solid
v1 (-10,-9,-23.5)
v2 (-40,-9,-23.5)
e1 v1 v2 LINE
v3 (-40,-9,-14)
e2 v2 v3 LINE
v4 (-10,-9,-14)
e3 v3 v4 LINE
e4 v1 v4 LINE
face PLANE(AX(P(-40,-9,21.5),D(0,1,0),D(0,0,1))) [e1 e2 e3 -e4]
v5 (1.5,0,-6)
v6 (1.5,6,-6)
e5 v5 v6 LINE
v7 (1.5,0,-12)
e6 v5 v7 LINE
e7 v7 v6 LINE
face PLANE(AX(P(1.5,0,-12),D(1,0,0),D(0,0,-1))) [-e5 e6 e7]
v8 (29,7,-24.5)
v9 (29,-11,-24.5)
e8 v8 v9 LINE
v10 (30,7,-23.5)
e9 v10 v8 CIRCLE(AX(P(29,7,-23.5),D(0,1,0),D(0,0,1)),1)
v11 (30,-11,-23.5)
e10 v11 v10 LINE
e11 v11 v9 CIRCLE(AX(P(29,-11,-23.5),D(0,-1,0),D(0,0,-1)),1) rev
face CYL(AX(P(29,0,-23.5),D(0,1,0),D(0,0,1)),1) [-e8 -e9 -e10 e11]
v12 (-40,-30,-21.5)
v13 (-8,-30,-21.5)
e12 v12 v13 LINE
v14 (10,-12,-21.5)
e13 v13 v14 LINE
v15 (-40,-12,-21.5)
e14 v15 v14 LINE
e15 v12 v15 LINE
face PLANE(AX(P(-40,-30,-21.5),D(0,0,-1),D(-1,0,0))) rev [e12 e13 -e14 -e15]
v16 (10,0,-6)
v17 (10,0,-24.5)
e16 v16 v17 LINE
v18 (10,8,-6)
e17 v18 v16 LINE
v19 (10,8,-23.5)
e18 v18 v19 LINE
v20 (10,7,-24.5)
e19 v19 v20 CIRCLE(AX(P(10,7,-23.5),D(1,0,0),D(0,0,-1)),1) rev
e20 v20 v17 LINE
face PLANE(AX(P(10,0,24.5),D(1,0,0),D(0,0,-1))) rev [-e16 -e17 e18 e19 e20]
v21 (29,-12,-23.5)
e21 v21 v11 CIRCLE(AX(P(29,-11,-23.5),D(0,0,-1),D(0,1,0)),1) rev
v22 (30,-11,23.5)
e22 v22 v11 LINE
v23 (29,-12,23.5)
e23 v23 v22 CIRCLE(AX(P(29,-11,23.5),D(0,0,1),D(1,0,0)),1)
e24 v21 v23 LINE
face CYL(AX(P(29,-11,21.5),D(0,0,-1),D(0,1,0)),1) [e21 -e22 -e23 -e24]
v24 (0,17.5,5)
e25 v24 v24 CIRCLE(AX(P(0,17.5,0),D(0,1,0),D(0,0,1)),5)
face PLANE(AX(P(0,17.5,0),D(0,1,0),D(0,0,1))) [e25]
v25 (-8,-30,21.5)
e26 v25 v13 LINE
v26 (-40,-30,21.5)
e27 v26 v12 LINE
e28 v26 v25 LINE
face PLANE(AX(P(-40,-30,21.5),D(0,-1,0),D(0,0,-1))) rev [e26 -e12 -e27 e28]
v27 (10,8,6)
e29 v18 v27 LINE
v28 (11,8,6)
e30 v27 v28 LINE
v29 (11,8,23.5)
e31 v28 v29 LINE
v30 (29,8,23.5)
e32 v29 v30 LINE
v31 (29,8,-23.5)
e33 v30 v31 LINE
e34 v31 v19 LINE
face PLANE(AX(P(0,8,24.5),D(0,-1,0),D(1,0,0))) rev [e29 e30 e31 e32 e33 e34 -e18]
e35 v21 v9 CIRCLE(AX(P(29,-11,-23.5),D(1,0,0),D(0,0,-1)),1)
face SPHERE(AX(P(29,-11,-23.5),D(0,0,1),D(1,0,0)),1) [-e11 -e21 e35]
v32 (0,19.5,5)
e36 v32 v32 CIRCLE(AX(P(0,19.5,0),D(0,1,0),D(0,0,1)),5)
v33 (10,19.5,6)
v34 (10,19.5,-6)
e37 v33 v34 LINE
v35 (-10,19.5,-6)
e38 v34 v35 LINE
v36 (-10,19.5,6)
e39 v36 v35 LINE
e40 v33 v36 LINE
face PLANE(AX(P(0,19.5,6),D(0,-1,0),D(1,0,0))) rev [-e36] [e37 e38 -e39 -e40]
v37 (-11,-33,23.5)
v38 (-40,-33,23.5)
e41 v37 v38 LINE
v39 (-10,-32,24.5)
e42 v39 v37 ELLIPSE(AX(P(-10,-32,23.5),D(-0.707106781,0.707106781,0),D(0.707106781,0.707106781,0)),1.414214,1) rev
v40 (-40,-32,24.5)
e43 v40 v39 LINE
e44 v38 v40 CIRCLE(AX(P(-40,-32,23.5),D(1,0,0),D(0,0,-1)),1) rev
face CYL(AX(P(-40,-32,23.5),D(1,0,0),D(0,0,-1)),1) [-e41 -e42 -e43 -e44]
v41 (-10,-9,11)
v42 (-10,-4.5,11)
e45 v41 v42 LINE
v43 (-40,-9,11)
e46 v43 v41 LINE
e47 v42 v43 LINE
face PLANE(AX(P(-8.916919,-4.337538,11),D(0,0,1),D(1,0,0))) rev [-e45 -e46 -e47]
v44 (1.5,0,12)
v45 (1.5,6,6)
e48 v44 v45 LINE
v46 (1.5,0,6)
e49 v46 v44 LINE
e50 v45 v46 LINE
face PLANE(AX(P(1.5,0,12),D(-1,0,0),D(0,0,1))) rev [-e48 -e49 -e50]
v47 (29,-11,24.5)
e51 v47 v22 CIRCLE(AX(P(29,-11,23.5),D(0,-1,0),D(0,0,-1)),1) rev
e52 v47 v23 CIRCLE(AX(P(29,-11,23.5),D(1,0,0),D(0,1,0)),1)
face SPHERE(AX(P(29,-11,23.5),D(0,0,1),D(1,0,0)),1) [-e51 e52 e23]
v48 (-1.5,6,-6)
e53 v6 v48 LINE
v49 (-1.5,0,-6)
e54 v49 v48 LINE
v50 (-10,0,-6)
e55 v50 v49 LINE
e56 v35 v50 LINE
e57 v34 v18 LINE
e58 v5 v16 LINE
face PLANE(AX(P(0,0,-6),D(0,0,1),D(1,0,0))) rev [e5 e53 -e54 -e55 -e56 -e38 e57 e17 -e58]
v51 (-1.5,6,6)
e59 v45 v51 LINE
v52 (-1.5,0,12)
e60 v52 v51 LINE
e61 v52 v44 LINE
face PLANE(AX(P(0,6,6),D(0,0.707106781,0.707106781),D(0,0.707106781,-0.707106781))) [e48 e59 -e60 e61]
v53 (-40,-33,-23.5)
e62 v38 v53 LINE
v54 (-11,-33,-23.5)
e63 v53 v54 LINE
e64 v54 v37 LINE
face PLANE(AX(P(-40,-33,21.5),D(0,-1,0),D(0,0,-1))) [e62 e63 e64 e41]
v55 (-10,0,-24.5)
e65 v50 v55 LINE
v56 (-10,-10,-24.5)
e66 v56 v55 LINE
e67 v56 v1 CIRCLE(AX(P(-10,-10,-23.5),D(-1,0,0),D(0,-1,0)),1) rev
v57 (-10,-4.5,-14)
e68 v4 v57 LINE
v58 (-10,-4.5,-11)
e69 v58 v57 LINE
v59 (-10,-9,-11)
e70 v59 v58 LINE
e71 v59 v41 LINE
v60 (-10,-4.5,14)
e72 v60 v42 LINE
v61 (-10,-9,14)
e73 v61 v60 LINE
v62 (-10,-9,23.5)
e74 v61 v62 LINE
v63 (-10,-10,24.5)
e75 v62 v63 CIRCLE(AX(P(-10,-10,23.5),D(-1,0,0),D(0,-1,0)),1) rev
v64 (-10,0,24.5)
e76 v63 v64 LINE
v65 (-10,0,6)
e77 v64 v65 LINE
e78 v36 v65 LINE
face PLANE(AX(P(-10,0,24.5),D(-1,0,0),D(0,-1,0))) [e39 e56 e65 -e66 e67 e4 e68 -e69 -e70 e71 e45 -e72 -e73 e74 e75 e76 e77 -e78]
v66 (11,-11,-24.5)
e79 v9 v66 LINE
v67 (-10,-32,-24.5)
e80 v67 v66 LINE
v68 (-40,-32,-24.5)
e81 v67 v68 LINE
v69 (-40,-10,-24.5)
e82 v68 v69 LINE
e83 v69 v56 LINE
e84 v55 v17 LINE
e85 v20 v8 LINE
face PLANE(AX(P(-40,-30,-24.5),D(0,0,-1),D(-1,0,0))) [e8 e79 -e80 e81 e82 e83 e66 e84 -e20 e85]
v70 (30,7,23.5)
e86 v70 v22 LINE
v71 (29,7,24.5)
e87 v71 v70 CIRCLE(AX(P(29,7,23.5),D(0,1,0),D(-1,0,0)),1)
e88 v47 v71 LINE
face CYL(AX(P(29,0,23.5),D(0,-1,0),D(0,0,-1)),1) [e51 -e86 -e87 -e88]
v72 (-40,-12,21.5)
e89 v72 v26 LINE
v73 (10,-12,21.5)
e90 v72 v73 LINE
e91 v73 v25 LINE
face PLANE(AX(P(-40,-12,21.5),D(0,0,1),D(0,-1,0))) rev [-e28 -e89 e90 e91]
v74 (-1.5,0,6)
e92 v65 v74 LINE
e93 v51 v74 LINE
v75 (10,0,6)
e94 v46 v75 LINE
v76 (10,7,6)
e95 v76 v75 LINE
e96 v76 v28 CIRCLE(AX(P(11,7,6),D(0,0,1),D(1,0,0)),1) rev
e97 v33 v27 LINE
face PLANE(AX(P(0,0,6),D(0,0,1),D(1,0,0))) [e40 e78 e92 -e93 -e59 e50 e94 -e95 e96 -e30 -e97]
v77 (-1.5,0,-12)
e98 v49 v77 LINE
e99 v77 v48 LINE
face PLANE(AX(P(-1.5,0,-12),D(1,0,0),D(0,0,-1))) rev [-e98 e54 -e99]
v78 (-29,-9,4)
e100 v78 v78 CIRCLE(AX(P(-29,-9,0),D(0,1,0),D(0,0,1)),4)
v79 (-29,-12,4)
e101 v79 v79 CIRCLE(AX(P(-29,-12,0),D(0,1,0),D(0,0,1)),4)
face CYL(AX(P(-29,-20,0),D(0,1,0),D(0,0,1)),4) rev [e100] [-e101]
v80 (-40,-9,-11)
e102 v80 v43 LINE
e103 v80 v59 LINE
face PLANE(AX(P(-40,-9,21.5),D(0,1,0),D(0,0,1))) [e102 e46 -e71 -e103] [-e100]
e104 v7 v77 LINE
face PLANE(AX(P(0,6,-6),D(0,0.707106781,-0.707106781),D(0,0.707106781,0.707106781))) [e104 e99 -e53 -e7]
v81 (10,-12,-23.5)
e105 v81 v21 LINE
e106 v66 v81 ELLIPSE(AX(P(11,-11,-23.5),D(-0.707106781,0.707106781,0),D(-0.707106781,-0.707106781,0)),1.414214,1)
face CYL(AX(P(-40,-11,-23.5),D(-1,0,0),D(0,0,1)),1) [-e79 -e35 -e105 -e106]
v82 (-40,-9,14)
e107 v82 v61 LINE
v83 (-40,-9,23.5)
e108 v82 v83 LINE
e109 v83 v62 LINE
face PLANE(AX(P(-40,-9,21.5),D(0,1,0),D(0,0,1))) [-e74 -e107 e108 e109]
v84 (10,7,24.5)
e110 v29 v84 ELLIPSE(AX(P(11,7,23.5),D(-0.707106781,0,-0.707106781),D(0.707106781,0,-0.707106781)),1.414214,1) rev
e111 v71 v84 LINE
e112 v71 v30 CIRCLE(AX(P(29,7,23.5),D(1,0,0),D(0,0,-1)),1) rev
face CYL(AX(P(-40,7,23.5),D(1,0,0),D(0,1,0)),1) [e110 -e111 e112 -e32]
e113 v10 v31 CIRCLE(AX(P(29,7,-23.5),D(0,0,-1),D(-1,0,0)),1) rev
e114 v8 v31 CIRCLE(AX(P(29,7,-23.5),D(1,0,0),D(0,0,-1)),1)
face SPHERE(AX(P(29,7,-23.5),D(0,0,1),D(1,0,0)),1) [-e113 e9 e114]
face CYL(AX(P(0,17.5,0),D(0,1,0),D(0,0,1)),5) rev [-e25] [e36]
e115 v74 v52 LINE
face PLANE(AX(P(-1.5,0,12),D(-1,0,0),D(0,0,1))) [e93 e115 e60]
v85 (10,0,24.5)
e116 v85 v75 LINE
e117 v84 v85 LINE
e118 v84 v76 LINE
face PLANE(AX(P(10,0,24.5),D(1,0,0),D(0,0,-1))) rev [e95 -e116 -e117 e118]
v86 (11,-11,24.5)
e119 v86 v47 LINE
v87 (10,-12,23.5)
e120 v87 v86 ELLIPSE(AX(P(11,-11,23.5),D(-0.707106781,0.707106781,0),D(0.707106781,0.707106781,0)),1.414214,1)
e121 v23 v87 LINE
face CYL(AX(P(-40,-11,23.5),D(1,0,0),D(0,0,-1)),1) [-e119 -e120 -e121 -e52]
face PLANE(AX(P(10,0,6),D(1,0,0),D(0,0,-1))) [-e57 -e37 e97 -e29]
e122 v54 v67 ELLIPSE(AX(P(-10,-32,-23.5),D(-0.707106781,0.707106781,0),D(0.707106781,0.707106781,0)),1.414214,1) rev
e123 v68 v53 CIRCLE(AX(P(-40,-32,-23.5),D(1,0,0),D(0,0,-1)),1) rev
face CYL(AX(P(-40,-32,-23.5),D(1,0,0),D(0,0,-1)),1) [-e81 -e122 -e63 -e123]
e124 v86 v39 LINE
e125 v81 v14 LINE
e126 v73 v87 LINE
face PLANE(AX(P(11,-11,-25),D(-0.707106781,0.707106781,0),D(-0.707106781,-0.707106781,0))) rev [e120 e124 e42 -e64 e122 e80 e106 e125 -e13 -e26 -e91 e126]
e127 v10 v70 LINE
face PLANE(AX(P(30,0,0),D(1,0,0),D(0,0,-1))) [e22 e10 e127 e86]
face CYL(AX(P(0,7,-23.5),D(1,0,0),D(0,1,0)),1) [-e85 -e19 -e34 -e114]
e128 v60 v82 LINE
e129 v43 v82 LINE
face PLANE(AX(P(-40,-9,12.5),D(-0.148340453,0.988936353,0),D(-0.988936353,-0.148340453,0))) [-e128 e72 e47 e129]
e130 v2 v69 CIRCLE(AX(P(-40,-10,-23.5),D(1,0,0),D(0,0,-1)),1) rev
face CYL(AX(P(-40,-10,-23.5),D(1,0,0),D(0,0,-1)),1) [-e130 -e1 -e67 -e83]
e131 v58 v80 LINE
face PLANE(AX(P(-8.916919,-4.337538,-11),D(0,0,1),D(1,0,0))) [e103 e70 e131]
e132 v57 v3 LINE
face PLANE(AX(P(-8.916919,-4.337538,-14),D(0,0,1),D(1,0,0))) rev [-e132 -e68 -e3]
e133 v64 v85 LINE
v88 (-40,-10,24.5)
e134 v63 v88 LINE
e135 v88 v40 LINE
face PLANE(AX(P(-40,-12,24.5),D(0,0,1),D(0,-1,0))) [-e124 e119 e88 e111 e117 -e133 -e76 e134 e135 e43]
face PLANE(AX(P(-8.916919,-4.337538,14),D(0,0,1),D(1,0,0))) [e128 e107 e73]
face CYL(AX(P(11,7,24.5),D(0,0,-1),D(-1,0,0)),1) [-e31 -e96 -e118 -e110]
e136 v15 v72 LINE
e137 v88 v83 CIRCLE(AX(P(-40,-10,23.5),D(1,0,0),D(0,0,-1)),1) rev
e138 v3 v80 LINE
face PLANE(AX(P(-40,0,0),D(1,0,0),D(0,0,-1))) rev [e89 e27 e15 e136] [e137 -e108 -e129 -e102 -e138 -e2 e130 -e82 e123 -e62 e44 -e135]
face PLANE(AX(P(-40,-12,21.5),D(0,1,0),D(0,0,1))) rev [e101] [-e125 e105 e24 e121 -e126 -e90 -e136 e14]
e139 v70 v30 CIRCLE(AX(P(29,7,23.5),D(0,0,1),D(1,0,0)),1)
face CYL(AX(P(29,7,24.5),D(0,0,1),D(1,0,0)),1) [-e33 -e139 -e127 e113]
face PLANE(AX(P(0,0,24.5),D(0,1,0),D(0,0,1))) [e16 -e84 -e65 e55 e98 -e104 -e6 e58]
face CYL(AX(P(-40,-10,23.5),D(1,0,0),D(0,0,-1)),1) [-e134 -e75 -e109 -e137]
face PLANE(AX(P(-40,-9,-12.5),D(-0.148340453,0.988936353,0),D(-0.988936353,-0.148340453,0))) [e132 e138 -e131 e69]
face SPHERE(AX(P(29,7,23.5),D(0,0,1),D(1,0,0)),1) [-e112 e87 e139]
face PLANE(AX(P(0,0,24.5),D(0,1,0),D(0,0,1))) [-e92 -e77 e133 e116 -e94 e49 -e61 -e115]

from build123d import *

# Parameters (mm, degrees)
EXTRUDE_1_DEPTH         = 30
EXTRUDE_1_DEPTH_BACK    = 40
SKETCH_2_W              = 49
SKETCH_2_H              = 24
SKETCH_2_W_2            = 43
SKETCH_2_H_2            = 18
EXTRUDE_1_2_DEPTH       = 6
SKETCH_1_3_W            = 20
SKETCH_1_3_H            = 8
EXTRUDE_2_DEPTH         = 24.5
CUT_EXTRUDE_1_DEPTH     = 25
RIB_1_REACH             = 58.032
SKETCH_4_WALLS_W        = 145.49538697
SKETCH_4_WALLS_H        = 3
RIB_2_REACH             = 65.649
SKETCH_6_WALLS_W        = 3
SKETCH_6_WALLS_H        = 137.784142328
CUT_EXTRUDE_START       = -12
CUT_EXTRUDE_2_OUTLINE_R = 4
CUT_EXTRUDE_2_DEPTH     = 3
FILLET_1_R              = 1
SKETCH_7_R              = 5
CUT_EXTRUDE_4_DEPTH     = 2


# Read off the part's stored shape, not the designer's step: 컷-돌출2
with BuildPart() as part:
    # 스케치2 → Extrude 1 (new, two sides: drawn at the far end of the back side and taken through both)
    with BuildSketch(Plane(origin=(0, 0, 0), x_dir=(0, 0, -1), z_dir=(1, 0, 0)).offset(-EXTRUDE_1_DEPTH_BACK)):
        with Locations((0, -21)):
            Rectangle(SKETCH_2_W, SKETCH_2_H)
        with Locations((0, -21)):
            Rectangle(SKETCH_2_W_2, SKETCH_2_H_2, mode=Mode.SUBTRACT)
    extrude(amount=EXTRUDE_1_DEPTH + EXTRUDE_1_DEPTH_BACK)



with BuildPart() as body_2:
    # 스케치1 → Extrude 1 2 (new, symmetric)
    with BuildSketch(Plane.XY):
        Polygon((-10, 19.5), (-10, 0), (10, 0), (10, 8), (10, 19.5), align=None)
    extrude(amount=EXTRUDE_1_2_DEPTH, both=True)


with BuildPart() as part_1:
    add(part.part)

    add(body_2.part)  # 보스-돌출2 merges body 2
    # 스케치1<3> → 보스-돌출2 (add, symmetric)
    with BuildSketch(Plane.XY):
        Polygon((10, 0), (-10, 0), (-10, -12), (10, -12), (30, -12), (30, 0), align=None)
        with Locations((20, 4)):
            Rectangle(SKETCH_1_3_W, SKETCH_1_3_H)
    extrude(amount=EXTRUDE_2_DEPTH, both=True)

    # 스케치1<4> → 컷-돌출1 (cut, symmetric)
    with BuildSketch(Plane.XY):
        Polygon((30, -12), (10, -12), (-11, -33), (30, -33), align=None)
    extrude(amount=CUT_EXTRUDE_1_DEPTH, both=True, mode=Mode.SUBTRACT)

    # 스케치4 walls → 보강대1 (add, up to next)
    with BuildSketch(Plane(origin=(0.4400978, -2.93398533, 0), x_dir=(0.9889363528682976, 0.14834045293024445, 0), z_dir=(-0.14834045293024445, 0.9889363528682976, 0)), mode=Mode.PRIVATE) as rib_1_sk1:
        with Locations((-25.177107795, -12.5)):
            Rectangle(SKETCH_4_WALLS_W, SKETCH_4_WALLS_H)
    rib_1_tool1 = extrude(rib_1_sk1.sketch, amount=-RIB_1_REACH, mode=Mode.PRIVATE) - part_1.part
    # 스케치4 walls → 보강대1 (add, up to next)
    with BuildSketch(Plane(origin=(0.4400978, -2.93398533, 0), x_dir=(0.9889363528682976, 0.14834045293024445, 0), z_dir=(-0.14834045293024445, 0.9889363528682976, 0)), mode=Mode.PRIVATE) as rib_1_sk2:
        with Locations((-25.177107795, 12.5)):
            Rectangle(SKETCH_4_WALLS_W, SKETCH_4_WALLS_H)
    rib_1_tool2 = extrude(rib_1_sk2.sketch, amount=-RIB_1_REACH, mode=Mode.PRIVATE) - part_1.part
    add(rib_1_tool1.solids().sort_by_distance((-24.458459359, -6.668768904, 12.5))[0])
    add(rib_1_tool2.solids().sort_by_distance((-24.458459359, -6.668768904, -12.5))[0])

    # 스케치6 walls → 보강대2 (add, up to next)
    with BuildSketch(Plane(origin=(0, 6, -6), x_dir=(1, 0, 0), z_dir=(0, 0.7071067811865477, -0.7071067811865474)), mode=Mode.PRIVATE) as rib_2_sk1:
        with Locations((0, 4.242640687)):
            Rectangle(SKETCH_6_WALLS_W, SKETCH_6_WALLS_H)
    rib_2_tool1 = extrude(rib_2_sk1.sketch, amount=-RIB_2_REACH, mode=Mode.PRIVATE) - part_1.part
    rib_2 = rib_2_tool1.solids().sort_by_distance((0, 3, -9))[0]
    add(rib_2)

    # 대칭 복사1: 보강대2 across plane
    add(rib_2.mirror(Plane.XY))

    # 컷-돌출2 outline → 컷-돌출2 (cut)
    with BuildSketch(Plane(origin=(0, 0, 0), x_dir=(1, 0, 0), z_dir=(0, 1, 0)).offset(CUT_EXTRUDE_START)):
        with Locations((-29, 0)):
            Circle(CUT_EXTRUDE_2_OUTLINE_R)
    extrude(amount=CUT_EXTRUDE_2_DEPTH, mode=Mode.SUBTRACT)

    # 필렛1
    fillet_1_edges = [part_1.edges().sort_by_distance(p)[0] for p in [
        (30, -2, 24.5),
        (30, -12, 0),
        (20, 8, -24.5),
        (30, 8, 0),
        (10, 8, 15.25),
        (20, 8, 24.5),
        (-25.5, -33, 24.5),
        (-25, -9, 24.5),
        (-25, -9, -24.5),
        (-25.5, -33, -24.5),
        (30, -2, -24.5),
        (20, -12, 24.5),
        (20, -12, -24.5),
    ]]
    fillet(fillet_1_edges, radius=FILLET_1_R)

    # 스케치7 → 컷-돌출4 (cut)
    with BuildSketch(Plane(origin=(0, 19.5, 0), x_dir=(1, 0, 0), z_dir=(0, 1, 0))):
        with Locations(Location((0, 0, 0), (0, 0, 270))):
            Circle(SKETCH_7_R)
    extrude(amount=-CUT_EXTRUDE_4_DEPTH, mode=Mode.SUBTRACT)


solid = part_1.part
